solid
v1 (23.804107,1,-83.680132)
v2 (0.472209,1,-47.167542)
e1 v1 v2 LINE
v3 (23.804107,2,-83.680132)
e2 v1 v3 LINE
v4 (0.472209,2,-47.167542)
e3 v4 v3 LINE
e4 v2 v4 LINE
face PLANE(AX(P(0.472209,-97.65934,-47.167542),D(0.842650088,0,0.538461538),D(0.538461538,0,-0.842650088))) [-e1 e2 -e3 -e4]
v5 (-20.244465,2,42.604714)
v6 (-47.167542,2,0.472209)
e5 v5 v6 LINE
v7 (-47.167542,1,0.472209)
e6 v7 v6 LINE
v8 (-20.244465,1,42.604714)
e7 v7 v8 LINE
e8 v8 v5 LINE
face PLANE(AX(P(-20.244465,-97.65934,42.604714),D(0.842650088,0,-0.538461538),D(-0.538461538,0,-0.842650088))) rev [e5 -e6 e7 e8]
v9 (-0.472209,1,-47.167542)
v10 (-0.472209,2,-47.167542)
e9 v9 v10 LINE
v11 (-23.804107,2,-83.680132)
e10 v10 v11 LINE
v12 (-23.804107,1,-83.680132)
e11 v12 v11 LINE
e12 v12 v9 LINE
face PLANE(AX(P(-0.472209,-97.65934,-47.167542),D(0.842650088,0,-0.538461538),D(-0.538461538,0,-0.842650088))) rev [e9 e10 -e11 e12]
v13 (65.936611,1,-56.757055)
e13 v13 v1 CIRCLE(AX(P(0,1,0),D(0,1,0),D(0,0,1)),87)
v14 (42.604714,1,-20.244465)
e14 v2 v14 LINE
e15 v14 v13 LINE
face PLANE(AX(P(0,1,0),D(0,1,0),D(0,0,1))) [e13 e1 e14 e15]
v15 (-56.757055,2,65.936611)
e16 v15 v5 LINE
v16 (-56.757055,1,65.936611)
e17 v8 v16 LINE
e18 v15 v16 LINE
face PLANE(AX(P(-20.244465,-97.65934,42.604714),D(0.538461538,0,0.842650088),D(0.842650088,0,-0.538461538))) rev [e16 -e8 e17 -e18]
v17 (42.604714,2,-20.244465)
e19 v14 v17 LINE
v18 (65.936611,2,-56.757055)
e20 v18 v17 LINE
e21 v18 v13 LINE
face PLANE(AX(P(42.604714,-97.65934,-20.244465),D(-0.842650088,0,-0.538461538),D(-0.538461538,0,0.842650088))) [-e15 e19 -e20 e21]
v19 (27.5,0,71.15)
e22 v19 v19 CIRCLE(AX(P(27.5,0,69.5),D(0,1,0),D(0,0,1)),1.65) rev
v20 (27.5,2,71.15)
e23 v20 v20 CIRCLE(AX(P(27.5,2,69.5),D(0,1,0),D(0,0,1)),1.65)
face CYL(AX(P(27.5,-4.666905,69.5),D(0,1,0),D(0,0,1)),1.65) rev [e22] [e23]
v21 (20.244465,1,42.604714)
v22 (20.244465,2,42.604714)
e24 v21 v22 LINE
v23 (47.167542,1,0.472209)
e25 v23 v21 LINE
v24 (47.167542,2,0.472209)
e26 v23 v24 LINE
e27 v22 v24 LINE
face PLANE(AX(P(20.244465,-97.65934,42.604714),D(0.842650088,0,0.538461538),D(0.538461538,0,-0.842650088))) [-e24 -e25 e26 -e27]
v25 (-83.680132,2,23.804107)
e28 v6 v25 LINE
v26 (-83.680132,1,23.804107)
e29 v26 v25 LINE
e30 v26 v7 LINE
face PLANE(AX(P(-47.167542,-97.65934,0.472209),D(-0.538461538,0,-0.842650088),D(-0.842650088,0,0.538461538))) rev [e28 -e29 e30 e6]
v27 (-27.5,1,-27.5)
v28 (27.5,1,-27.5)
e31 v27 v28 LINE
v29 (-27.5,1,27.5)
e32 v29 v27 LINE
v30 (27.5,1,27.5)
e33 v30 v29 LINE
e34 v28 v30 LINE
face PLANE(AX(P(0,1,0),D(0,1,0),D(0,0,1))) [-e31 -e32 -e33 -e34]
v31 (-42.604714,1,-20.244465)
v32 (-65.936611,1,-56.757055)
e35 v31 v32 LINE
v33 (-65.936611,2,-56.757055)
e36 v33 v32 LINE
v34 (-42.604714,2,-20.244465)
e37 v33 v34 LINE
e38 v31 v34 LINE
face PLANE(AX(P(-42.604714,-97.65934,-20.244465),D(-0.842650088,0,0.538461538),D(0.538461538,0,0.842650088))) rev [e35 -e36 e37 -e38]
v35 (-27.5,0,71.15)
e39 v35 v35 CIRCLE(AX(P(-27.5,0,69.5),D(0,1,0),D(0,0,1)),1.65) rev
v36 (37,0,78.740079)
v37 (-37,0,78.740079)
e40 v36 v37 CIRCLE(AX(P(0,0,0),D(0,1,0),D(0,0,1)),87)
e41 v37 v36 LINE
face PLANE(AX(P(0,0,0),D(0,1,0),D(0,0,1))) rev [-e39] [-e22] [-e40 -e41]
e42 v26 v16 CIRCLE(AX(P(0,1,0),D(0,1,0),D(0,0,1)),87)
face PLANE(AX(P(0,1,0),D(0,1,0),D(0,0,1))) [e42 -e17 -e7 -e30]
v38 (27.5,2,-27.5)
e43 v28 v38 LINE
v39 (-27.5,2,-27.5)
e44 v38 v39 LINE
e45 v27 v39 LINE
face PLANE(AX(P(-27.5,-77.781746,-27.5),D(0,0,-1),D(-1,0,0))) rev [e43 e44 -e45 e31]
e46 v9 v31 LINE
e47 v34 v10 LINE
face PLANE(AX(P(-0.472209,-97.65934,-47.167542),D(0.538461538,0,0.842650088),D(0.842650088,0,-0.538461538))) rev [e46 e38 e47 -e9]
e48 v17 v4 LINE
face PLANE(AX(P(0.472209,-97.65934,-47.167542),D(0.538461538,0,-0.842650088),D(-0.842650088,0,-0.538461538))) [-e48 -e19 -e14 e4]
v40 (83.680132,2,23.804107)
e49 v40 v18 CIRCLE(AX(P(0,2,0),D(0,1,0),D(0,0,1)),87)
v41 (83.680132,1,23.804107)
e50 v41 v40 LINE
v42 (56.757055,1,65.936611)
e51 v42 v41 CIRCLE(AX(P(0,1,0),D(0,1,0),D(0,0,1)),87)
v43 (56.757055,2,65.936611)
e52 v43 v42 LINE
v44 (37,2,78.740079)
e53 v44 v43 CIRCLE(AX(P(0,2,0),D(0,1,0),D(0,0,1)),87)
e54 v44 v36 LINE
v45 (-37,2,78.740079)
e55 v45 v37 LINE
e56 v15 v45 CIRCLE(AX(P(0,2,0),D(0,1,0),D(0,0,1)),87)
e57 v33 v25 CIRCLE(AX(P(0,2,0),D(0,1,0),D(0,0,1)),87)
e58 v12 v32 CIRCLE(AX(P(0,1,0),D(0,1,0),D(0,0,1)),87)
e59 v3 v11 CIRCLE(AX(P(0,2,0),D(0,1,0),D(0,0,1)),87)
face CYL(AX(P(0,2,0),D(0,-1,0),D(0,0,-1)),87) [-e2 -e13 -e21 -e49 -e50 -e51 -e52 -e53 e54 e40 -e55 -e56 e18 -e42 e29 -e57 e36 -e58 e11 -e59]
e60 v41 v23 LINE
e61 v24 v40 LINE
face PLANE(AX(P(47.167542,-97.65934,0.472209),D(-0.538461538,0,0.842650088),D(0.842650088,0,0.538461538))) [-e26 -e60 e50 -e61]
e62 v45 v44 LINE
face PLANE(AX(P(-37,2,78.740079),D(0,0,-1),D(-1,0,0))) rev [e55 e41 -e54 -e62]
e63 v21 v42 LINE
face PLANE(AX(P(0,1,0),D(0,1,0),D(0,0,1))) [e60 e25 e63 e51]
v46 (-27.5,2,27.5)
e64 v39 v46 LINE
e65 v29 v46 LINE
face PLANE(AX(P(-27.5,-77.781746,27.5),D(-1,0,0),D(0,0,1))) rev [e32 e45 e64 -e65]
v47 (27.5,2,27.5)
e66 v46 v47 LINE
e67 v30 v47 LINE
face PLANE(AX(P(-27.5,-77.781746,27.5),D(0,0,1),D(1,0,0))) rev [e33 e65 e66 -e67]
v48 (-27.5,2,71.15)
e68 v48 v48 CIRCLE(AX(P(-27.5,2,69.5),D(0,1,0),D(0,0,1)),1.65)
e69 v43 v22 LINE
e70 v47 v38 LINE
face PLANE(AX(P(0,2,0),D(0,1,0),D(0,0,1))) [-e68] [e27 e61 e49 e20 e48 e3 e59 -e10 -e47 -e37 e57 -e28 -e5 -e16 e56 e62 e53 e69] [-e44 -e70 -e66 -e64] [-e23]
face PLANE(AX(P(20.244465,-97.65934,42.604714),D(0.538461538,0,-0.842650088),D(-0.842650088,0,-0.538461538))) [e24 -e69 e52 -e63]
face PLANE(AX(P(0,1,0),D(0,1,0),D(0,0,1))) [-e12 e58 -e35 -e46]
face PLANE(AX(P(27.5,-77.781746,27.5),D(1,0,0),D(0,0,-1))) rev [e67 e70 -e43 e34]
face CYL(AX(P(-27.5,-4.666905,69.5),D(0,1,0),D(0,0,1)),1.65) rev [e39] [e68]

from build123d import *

# Parameters (mm, degrees)
RESSALTO_EXTRUS_O1_DEPTH = 2
ESBO_O3_W                = 55
ESBO_O3_H                = 55
CORTE_EXTRUS_O1_DEPTH    = 1
CORTE_EXTRUS_O2_DEPTH    = 1
ESPELHAR1_START          = 1
ESPELHAR1_DEPTH          = 1
ESBO_O5_R                = 1.65
CORTE_EXTRUS_O3_DEPTH    = 2


# Read off the part's stored shape, not the designer's step: Espelhar1
with BuildPart() as part:
    # Esboço2 → Ressalto-extrusão1 (new body)
    with BuildSketch(Plane(origin=(0, 0, 0), x_dir=(1, 0, 0), z_dir=(0, 1, 0))):
        with BuildLine():
            Line((-37, -78.74007874), (37, -78.74007874))
            ThreePointArc((37, -78.74007874), (0, 87), (-37, -78.74007874))
        make_face()
    extrude(amount=RESSALTO_EXTRUS_O1_DEPTH)

    # Esboço3 → Corte-extrusão1 (cut)
    with BuildSketch(Plane(origin=(0, 2, 0), x_dir=(1, 0, 0), z_dir=(0, 1, 0))):
        Rectangle(ESBO_O3_W, ESBO_O3_H)
    extrude(amount=-CORTE_EXTRUS_O1_DEPTH, mode=Mode.SUBTRACT)

    # Esboço4 → Corte-extrusão2 (cut)
    with BuildSketch(Plane(origin=(0, 2, 0), x_dir=(1, 0, 0), z_dir=(0, 1, 0))):
        Polygon((-0.472209327, 47.167542), (-42.60471375, 20.244465077), (-69.527790673, 62.376969501), (-27.39528625, 89.300046424), align=None)
        Polygon((-20.244465077, -42.60471375), (-47.167542, -0.472209327), (-89.300046424, -27.39528625), (-62.376969501, -69.527790673), align=None)
    extrude(amount=-CORTE_EXTRUS_O2_DEPTH, mode=Mode.SUBTRACT)

    # Espelhar1 outline → Espelhar1 (cut)
    with BuildSketch(Plane(origin=(0, 0, 0), x_dir=(1, 0, 0), z_dir=(0, 1, 0)).offset(ESPELHAR1_START)):
        with BuildLine():
            Line((42.60471375, 20.244465077), (65.936611163, 56.757055141))
            ThreePointArc((65.936611163, 56.757055141), (46.846153846, 73.310557697), (23.80410674, 83.680132064))
            Line((23.80410674, 83.680132064), (0.472209327, 47.167542))
            Line((0.472209327, 47.167542), (42.60471375, 20.244465077))
        make_face()
        with BuildLine():
            ThreePointArc((56.757055141, -65.936611163), (73.310557697, -46.846153846), (83.680132064, -23.80410674))
            Line((83.680132064, -23.80410674), (47.167542, -0.472209327))
            Line((47.167542, -0.472209327), (20.244465077, -42.60471375))
            Line((20.244465077, -42.60471375), (56.757055141, -65.936611163))
        make_face()
    extrude(amount=ESPELHAR1_DEPTH, mode=Mode.SUBTRACT)

    # Esboço5 → Corte-extrusão3 (cut)
    with BuildSketch(Plane(origin=(0, 2, 0), x_dir=(1, 0, 0), z_dir=(0, 1, 0))):
        with Locations(Location((-27.5, -69.5, 0), (0, 0, 270))):
            Circle(ESBO_O5_R)
        with Locations(Location((27.5, -69.5, 0), (0, 0, 270))):
            Circle(ESBO_O5_R)
    extrude(amount=-CORTE_EXTRUS_O3_DEPTH, mode=Mode.SUBTRACT)


solid = part.part
